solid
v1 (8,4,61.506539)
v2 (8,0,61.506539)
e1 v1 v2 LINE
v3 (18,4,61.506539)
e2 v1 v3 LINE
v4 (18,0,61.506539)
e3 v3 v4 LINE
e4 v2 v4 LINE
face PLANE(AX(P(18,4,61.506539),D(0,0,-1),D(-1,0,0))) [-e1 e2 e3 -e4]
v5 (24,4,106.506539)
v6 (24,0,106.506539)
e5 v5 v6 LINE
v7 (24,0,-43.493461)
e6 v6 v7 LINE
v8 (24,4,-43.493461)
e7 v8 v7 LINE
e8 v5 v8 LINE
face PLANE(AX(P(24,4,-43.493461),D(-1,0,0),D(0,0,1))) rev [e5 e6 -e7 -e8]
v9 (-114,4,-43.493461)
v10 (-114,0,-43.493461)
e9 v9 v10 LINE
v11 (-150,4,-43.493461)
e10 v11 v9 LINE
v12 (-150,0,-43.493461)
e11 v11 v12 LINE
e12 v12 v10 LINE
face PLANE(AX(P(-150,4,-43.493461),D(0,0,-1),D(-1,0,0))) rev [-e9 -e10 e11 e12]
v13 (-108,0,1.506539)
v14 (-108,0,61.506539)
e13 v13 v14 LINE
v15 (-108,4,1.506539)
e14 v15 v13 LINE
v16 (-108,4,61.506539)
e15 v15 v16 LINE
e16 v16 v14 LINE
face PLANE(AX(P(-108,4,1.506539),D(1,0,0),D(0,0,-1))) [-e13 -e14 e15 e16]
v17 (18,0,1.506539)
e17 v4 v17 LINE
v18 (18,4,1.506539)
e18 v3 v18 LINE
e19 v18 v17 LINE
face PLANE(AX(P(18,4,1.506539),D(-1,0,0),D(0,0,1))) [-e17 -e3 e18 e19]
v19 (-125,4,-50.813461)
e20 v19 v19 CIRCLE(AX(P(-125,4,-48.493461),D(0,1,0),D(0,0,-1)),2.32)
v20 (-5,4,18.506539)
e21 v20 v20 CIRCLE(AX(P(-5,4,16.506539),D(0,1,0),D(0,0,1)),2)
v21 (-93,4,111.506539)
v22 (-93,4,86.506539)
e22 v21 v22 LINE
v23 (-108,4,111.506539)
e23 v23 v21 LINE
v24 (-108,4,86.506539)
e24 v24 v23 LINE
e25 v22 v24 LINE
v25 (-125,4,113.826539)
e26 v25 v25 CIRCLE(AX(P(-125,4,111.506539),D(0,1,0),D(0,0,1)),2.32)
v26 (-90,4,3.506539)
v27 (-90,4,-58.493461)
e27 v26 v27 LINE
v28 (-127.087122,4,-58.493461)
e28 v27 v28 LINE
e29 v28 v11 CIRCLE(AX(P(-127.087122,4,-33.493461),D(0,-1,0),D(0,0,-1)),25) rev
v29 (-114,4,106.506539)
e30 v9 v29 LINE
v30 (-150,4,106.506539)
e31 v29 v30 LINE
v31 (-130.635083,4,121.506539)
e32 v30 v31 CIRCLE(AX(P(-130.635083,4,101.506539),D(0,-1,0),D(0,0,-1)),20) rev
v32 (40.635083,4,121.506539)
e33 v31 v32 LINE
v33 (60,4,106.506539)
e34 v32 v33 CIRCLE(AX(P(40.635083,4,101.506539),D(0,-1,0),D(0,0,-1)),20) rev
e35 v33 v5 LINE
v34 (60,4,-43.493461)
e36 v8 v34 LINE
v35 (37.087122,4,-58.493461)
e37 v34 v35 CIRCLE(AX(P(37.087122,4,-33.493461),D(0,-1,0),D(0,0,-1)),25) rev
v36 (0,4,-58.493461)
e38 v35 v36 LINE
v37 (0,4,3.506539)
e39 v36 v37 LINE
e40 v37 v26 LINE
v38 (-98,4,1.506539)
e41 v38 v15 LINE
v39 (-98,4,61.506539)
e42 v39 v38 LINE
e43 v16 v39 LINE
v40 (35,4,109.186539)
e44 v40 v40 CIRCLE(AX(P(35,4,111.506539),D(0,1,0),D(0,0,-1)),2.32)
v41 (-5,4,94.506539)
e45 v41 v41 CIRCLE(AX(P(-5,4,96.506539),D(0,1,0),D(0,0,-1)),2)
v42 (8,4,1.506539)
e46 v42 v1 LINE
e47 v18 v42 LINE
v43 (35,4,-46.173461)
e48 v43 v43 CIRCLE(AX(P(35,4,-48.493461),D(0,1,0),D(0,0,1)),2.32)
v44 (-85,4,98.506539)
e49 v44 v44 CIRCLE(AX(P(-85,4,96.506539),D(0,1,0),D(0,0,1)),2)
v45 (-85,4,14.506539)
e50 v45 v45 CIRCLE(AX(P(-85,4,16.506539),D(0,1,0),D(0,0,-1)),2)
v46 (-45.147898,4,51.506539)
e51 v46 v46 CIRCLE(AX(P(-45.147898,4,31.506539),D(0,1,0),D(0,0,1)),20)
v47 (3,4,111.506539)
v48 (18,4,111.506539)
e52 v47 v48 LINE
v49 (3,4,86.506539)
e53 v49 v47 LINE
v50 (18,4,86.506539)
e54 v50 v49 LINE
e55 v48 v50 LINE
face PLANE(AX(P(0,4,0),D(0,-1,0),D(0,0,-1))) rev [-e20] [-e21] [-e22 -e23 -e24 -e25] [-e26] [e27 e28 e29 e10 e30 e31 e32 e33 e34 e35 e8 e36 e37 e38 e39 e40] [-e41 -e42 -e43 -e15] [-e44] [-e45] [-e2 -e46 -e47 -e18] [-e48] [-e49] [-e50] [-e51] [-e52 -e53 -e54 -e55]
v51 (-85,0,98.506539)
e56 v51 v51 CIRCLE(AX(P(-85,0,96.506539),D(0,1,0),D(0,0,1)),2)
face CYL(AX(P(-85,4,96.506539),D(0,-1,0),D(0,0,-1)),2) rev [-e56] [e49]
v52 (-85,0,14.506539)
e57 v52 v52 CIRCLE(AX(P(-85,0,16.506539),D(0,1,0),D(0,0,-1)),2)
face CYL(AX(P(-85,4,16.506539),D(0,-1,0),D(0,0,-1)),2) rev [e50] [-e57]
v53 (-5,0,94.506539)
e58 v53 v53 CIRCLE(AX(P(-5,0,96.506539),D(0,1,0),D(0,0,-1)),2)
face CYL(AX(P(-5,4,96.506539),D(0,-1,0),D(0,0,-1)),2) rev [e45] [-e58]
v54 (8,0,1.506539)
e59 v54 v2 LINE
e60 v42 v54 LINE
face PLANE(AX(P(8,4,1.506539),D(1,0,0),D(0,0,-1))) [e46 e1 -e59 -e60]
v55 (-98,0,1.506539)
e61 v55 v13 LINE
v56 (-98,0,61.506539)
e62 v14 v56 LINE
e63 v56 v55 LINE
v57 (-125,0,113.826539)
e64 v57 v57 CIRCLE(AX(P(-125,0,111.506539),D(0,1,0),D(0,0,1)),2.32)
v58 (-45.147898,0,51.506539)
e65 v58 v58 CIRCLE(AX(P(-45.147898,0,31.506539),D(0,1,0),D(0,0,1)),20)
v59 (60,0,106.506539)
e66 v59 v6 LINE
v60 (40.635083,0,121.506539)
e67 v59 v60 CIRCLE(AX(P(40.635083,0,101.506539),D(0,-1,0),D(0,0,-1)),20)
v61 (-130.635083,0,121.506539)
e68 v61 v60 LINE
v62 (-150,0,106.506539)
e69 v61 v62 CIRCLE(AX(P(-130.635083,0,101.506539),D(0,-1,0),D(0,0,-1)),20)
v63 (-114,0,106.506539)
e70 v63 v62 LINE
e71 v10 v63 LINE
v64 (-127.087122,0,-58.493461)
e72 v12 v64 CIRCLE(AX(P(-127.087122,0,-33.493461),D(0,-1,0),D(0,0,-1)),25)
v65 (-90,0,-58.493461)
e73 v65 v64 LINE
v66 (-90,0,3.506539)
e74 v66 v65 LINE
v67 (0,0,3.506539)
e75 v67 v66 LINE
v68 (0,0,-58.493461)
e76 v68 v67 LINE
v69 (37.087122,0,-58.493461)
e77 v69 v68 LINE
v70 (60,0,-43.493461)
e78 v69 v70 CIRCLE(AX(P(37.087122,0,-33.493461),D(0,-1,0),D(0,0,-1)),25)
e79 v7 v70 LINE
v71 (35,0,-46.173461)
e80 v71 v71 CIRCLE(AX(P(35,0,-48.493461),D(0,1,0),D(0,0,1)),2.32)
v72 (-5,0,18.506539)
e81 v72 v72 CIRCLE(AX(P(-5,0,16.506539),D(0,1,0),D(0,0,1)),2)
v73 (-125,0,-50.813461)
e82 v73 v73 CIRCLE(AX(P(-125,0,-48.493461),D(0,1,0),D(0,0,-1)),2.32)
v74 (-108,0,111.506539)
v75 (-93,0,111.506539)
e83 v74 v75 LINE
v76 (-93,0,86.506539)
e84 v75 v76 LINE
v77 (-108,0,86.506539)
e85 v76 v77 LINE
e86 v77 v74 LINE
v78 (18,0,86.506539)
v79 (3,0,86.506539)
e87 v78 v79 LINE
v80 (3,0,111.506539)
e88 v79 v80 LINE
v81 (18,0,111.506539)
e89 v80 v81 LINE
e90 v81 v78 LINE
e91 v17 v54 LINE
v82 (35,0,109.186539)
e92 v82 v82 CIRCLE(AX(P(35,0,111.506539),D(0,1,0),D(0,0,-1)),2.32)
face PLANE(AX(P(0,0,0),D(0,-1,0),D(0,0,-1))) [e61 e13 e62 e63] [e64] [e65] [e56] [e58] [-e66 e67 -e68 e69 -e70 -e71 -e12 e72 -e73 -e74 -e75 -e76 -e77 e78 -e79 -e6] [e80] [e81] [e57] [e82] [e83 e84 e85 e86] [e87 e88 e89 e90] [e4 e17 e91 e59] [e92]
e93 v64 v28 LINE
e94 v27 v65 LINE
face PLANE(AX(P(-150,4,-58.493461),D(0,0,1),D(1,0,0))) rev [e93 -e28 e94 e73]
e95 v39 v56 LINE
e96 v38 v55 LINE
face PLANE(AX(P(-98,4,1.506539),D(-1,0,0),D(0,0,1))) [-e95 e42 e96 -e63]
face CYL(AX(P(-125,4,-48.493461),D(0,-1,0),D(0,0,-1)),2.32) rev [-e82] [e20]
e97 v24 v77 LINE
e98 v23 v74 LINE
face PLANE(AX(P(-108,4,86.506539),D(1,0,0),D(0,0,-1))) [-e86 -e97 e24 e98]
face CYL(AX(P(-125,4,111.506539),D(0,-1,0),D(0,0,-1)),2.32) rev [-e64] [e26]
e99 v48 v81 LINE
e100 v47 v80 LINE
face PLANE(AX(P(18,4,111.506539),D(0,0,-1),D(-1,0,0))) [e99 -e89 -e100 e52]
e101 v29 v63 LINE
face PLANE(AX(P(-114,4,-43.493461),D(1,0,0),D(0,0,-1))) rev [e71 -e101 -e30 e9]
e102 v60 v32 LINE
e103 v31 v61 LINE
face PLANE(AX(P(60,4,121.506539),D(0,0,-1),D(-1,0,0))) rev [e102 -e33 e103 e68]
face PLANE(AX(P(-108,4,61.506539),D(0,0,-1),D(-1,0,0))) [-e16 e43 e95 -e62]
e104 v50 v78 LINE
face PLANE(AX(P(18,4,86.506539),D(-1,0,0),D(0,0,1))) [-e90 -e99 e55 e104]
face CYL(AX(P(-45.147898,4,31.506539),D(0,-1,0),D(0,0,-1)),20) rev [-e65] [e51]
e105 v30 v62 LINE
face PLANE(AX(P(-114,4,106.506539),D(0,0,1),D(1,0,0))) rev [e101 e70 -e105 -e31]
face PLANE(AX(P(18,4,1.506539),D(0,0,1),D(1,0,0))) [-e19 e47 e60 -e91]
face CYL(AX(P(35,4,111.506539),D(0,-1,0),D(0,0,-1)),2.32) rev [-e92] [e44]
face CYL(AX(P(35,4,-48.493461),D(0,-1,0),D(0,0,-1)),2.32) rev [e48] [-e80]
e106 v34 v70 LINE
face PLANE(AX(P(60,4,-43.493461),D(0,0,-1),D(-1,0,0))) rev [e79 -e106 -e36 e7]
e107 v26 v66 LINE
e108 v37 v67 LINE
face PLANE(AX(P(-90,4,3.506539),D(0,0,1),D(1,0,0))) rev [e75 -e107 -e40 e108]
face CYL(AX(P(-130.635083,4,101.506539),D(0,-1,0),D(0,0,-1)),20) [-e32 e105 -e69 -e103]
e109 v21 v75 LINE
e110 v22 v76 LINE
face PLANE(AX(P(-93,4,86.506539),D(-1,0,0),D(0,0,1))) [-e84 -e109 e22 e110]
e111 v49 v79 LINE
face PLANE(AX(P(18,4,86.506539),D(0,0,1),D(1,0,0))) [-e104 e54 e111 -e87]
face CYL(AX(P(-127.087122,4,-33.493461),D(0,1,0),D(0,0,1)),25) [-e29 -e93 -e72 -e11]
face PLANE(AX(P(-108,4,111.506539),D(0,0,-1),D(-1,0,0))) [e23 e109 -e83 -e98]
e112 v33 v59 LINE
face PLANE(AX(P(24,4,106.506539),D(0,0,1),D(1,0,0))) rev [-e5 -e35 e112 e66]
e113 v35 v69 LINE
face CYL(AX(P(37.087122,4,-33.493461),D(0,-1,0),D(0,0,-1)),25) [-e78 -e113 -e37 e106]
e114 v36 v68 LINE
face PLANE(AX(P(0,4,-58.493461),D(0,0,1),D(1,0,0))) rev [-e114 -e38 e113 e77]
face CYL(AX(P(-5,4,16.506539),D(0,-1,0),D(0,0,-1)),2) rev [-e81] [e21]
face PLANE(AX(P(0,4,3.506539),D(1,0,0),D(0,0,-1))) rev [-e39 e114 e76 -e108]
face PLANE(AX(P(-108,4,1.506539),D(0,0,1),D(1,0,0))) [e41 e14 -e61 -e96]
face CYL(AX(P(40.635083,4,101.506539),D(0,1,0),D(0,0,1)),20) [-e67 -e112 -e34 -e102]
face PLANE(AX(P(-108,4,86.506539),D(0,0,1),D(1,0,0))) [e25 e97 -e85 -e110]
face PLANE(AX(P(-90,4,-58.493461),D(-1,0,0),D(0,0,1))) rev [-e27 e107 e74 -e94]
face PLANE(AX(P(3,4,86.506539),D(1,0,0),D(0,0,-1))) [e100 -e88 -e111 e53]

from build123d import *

# Parameters (mm, degrees)
SKETCH1_R           = 20
SKETCH1_R_2         = 2.32
SKETCH1_R_3         = 2
SKETCH1_W           = 10
SKETCH1_H           = 60
SKETCH1_W_2         = 15
SKETCH1_H_2         = 25
BOSS_EXTRUDE1_DEPTH = 4
FILLET2_R           = 20
FILLET3_R           = 25


with BuildPart() as part:
    # Sketch1 → Boss-Extrude1 (new body)
    with BuildSketch(Plane(origin=(0, 0, 0), x_dir=(1, 0, 0), z_dir=(0, 1, 0))):
        Polygon((-150, 43.493460664), (-114, 43.493460664), (-114, -106.506539336), (-150, -106.506539336), (-150, -121.506539336), (60, -121.506539336), (60, -106.506539336), (24, -106.506539336), (24, 43.493460664), (60, 43.493460664), (60, 58.493460664), (0, 58.493460664), (0, -3.506539336), (-90, -3.506539336), (-90, 58.493460664), (-150, 58.493460664), align=None)
        with Locations(Location((-45.147898231, -31.506539336, 0), (0, 0, 270))):
            Circle(SKETCH1_R, mode=Mode.SUBTRACT)
        with Locations(Location((-125, -111.506539336, 0), (0, 0, 270))):
            Circle(SKETCH1_R_2, mode=Mode.SUBTRACT)
        with Locations(Location((-125, 48.493460664, 0), (0, 0, 90))):
            Circle(SKETCH1_R_2, mode=Mode.SUBTRACT)
        with Locations(Location((35, 48.493460664, 0), (0, 0, 270))):
            Circle(SKETCH1_R_2, mode=Mode.SUBTRACT)
        with Locations(Location((35, -111.506539336, 0), (0, 0, 90))):
            Circle(SKETCH1_R_2, mode=Mode.SUBTRACT)
        with Locations(Location((-85, -96.506539336, 0), (0, 0, 270))):
            Circle(SKETCH1_R_3, mode=Mode.SUBTRACT)
        with Locations(Location((-5, -96.506539336, 0), (0, 0, 90))):
            Circle(SKETCH1_R_3, mode=Mode.SUBTRACT)
        with Locations(Location((-85, -16.506539336, 0), (0, 0, 90))):
            Circle(SKETCH1_R_3, mode=Mode.SUBTRACT)
        with Locations(Location((-5, -16.506539336, 0), (0, 0, 270))):
            Circle(SKETCH1_R_3, mode=Mode.SUBTRACT)
        with Locations((13, -31.506539336)):
            Rectangle(SKETCH1_W, SKETCH1_H, mode=Mode.SUBTRACT)
        with Locations((-103, -31.506539336)):
            Rectangle(SKETCH1_W, SKETCH1_H, mode=Mode.SUBTRACT)
        with Locations((10.5, -99.006539336)):
            Rectangle(SKETCH1_W_2, SKETCH1_H_2, mode=Mode.SUBTRACT)
        with Locations((-100.5, -99.006539336)):
            Rectangle(SKETCH1_W_2, SKETCH1_H_2, mode=Mode.SUBTRACT)
    extrude(amount=BOSS_EXTRUDE1_DEPTH)

    # Fillet2
    # the kernel refuses this fillet: 20 mm, written as the material it takes off along each edge
    with BuildSketch(Plane(origin=(60, -48.412291828, 121.506539336), x_dir=(-1, 0, 0), z_dir=(0, 1, 0))) as fillet2_piece_1:
        with BuildLine():
            CenterArc((19.364916731, -20), FILLET2_R, 90, 75.522487814)
            Line((0, -15), (-0.387298335, -14.9))
            ThreePointArc((-0.387298335, -14.9), (-0.4, -7.5), (-0.4, 0))
            Line((-0.4, 0), (0, 0.4))
            Line((0, 0.4), (19.364916731, 0.4))
            Line((19.364916731, 0.4), (19.364916731, 0))
        make_face()
    extrude(amount=100.824583655, mode=Mode.SUBTRACT)
    with BuildSketch(Plane(origin=(-150, -48.412291828, 121.506539336), x_dir=(0, 0, -1), z_dir=(0, 1, 0))) as fillet2_piece_2:
        with BuildLine():
            CenterArc((20, -19.364916731), FILLET2_R, 104.477512186, 75.522487814)
            Line((0, -19.364916731), (-0.4, -19.364916731))
            Line((-0.4, -19.364916731), (-0.4, 0))
            Line((-0.4, 0), (0, 0.4))
            ThreePointArc((0, 0.4), (7.5, 0.4), (14.9, 0.387298335))
            Line((14.9, 0.387298335), (15, 0))
        make_face()
    extrude(amount=100.824583655, mode=Mode.SUBTRACT)

    # Fillet3
    # the kernel refuses this fillet: 25 mm, written as the material it takes off along each edge
    with BuildSketch(Plane(origin=(60, -57.282196187, -58.493460664), x_dir=(-1, 0, 0), z_dir=(0, 1, 0))) as fillet3_piece_1:
        with BuildLine():
            CenterArc((22.912878475, 25), FILLET3_R, 203.578178478, 66.421821522)
            Line((0, 15), (-0.458257569, 14.8))
            ThreePointArc((-0.458257569, 14.8), (-0.5, 7.5), (-0.5, 0))
            Line((-0.5, 0), (0, -0.5))
            Line((0, -0.5), (22.912878475, -0.5))
            Line((22.912878475, -0.5), (22.912878475, 0))
        make_face()
    extrude(amount=118.564392374, mode=Mode.SUBTRACT)
    with BuildSketch(Plane(origin=(-150, -57.282196187, -58.493460664), x_dir=(0, 0, 1), z_dir=(0, 1, 0))) as fillet3_piece_2:
        with BuildLine():
            CenterArc((25, 22.912878475), FILLET3_R, 180, 66.421821522)
            Line((0, 22.912878475), (-0.5, 22.912878475))
            Line((-0.5, 22.912878475), (-0.5, 0))
            Line((-0.5, 0), (0, -0.5))
            ThreePointArc((0, -0.5), (7.5, -0.5), (14.8, -0.458257569))
            Line((14.8, -0.458257569), (15, 0))
        make_face()
    extrude(amount=118.564392374, mode=Mode.SUBTRACT)


solid = part.part
